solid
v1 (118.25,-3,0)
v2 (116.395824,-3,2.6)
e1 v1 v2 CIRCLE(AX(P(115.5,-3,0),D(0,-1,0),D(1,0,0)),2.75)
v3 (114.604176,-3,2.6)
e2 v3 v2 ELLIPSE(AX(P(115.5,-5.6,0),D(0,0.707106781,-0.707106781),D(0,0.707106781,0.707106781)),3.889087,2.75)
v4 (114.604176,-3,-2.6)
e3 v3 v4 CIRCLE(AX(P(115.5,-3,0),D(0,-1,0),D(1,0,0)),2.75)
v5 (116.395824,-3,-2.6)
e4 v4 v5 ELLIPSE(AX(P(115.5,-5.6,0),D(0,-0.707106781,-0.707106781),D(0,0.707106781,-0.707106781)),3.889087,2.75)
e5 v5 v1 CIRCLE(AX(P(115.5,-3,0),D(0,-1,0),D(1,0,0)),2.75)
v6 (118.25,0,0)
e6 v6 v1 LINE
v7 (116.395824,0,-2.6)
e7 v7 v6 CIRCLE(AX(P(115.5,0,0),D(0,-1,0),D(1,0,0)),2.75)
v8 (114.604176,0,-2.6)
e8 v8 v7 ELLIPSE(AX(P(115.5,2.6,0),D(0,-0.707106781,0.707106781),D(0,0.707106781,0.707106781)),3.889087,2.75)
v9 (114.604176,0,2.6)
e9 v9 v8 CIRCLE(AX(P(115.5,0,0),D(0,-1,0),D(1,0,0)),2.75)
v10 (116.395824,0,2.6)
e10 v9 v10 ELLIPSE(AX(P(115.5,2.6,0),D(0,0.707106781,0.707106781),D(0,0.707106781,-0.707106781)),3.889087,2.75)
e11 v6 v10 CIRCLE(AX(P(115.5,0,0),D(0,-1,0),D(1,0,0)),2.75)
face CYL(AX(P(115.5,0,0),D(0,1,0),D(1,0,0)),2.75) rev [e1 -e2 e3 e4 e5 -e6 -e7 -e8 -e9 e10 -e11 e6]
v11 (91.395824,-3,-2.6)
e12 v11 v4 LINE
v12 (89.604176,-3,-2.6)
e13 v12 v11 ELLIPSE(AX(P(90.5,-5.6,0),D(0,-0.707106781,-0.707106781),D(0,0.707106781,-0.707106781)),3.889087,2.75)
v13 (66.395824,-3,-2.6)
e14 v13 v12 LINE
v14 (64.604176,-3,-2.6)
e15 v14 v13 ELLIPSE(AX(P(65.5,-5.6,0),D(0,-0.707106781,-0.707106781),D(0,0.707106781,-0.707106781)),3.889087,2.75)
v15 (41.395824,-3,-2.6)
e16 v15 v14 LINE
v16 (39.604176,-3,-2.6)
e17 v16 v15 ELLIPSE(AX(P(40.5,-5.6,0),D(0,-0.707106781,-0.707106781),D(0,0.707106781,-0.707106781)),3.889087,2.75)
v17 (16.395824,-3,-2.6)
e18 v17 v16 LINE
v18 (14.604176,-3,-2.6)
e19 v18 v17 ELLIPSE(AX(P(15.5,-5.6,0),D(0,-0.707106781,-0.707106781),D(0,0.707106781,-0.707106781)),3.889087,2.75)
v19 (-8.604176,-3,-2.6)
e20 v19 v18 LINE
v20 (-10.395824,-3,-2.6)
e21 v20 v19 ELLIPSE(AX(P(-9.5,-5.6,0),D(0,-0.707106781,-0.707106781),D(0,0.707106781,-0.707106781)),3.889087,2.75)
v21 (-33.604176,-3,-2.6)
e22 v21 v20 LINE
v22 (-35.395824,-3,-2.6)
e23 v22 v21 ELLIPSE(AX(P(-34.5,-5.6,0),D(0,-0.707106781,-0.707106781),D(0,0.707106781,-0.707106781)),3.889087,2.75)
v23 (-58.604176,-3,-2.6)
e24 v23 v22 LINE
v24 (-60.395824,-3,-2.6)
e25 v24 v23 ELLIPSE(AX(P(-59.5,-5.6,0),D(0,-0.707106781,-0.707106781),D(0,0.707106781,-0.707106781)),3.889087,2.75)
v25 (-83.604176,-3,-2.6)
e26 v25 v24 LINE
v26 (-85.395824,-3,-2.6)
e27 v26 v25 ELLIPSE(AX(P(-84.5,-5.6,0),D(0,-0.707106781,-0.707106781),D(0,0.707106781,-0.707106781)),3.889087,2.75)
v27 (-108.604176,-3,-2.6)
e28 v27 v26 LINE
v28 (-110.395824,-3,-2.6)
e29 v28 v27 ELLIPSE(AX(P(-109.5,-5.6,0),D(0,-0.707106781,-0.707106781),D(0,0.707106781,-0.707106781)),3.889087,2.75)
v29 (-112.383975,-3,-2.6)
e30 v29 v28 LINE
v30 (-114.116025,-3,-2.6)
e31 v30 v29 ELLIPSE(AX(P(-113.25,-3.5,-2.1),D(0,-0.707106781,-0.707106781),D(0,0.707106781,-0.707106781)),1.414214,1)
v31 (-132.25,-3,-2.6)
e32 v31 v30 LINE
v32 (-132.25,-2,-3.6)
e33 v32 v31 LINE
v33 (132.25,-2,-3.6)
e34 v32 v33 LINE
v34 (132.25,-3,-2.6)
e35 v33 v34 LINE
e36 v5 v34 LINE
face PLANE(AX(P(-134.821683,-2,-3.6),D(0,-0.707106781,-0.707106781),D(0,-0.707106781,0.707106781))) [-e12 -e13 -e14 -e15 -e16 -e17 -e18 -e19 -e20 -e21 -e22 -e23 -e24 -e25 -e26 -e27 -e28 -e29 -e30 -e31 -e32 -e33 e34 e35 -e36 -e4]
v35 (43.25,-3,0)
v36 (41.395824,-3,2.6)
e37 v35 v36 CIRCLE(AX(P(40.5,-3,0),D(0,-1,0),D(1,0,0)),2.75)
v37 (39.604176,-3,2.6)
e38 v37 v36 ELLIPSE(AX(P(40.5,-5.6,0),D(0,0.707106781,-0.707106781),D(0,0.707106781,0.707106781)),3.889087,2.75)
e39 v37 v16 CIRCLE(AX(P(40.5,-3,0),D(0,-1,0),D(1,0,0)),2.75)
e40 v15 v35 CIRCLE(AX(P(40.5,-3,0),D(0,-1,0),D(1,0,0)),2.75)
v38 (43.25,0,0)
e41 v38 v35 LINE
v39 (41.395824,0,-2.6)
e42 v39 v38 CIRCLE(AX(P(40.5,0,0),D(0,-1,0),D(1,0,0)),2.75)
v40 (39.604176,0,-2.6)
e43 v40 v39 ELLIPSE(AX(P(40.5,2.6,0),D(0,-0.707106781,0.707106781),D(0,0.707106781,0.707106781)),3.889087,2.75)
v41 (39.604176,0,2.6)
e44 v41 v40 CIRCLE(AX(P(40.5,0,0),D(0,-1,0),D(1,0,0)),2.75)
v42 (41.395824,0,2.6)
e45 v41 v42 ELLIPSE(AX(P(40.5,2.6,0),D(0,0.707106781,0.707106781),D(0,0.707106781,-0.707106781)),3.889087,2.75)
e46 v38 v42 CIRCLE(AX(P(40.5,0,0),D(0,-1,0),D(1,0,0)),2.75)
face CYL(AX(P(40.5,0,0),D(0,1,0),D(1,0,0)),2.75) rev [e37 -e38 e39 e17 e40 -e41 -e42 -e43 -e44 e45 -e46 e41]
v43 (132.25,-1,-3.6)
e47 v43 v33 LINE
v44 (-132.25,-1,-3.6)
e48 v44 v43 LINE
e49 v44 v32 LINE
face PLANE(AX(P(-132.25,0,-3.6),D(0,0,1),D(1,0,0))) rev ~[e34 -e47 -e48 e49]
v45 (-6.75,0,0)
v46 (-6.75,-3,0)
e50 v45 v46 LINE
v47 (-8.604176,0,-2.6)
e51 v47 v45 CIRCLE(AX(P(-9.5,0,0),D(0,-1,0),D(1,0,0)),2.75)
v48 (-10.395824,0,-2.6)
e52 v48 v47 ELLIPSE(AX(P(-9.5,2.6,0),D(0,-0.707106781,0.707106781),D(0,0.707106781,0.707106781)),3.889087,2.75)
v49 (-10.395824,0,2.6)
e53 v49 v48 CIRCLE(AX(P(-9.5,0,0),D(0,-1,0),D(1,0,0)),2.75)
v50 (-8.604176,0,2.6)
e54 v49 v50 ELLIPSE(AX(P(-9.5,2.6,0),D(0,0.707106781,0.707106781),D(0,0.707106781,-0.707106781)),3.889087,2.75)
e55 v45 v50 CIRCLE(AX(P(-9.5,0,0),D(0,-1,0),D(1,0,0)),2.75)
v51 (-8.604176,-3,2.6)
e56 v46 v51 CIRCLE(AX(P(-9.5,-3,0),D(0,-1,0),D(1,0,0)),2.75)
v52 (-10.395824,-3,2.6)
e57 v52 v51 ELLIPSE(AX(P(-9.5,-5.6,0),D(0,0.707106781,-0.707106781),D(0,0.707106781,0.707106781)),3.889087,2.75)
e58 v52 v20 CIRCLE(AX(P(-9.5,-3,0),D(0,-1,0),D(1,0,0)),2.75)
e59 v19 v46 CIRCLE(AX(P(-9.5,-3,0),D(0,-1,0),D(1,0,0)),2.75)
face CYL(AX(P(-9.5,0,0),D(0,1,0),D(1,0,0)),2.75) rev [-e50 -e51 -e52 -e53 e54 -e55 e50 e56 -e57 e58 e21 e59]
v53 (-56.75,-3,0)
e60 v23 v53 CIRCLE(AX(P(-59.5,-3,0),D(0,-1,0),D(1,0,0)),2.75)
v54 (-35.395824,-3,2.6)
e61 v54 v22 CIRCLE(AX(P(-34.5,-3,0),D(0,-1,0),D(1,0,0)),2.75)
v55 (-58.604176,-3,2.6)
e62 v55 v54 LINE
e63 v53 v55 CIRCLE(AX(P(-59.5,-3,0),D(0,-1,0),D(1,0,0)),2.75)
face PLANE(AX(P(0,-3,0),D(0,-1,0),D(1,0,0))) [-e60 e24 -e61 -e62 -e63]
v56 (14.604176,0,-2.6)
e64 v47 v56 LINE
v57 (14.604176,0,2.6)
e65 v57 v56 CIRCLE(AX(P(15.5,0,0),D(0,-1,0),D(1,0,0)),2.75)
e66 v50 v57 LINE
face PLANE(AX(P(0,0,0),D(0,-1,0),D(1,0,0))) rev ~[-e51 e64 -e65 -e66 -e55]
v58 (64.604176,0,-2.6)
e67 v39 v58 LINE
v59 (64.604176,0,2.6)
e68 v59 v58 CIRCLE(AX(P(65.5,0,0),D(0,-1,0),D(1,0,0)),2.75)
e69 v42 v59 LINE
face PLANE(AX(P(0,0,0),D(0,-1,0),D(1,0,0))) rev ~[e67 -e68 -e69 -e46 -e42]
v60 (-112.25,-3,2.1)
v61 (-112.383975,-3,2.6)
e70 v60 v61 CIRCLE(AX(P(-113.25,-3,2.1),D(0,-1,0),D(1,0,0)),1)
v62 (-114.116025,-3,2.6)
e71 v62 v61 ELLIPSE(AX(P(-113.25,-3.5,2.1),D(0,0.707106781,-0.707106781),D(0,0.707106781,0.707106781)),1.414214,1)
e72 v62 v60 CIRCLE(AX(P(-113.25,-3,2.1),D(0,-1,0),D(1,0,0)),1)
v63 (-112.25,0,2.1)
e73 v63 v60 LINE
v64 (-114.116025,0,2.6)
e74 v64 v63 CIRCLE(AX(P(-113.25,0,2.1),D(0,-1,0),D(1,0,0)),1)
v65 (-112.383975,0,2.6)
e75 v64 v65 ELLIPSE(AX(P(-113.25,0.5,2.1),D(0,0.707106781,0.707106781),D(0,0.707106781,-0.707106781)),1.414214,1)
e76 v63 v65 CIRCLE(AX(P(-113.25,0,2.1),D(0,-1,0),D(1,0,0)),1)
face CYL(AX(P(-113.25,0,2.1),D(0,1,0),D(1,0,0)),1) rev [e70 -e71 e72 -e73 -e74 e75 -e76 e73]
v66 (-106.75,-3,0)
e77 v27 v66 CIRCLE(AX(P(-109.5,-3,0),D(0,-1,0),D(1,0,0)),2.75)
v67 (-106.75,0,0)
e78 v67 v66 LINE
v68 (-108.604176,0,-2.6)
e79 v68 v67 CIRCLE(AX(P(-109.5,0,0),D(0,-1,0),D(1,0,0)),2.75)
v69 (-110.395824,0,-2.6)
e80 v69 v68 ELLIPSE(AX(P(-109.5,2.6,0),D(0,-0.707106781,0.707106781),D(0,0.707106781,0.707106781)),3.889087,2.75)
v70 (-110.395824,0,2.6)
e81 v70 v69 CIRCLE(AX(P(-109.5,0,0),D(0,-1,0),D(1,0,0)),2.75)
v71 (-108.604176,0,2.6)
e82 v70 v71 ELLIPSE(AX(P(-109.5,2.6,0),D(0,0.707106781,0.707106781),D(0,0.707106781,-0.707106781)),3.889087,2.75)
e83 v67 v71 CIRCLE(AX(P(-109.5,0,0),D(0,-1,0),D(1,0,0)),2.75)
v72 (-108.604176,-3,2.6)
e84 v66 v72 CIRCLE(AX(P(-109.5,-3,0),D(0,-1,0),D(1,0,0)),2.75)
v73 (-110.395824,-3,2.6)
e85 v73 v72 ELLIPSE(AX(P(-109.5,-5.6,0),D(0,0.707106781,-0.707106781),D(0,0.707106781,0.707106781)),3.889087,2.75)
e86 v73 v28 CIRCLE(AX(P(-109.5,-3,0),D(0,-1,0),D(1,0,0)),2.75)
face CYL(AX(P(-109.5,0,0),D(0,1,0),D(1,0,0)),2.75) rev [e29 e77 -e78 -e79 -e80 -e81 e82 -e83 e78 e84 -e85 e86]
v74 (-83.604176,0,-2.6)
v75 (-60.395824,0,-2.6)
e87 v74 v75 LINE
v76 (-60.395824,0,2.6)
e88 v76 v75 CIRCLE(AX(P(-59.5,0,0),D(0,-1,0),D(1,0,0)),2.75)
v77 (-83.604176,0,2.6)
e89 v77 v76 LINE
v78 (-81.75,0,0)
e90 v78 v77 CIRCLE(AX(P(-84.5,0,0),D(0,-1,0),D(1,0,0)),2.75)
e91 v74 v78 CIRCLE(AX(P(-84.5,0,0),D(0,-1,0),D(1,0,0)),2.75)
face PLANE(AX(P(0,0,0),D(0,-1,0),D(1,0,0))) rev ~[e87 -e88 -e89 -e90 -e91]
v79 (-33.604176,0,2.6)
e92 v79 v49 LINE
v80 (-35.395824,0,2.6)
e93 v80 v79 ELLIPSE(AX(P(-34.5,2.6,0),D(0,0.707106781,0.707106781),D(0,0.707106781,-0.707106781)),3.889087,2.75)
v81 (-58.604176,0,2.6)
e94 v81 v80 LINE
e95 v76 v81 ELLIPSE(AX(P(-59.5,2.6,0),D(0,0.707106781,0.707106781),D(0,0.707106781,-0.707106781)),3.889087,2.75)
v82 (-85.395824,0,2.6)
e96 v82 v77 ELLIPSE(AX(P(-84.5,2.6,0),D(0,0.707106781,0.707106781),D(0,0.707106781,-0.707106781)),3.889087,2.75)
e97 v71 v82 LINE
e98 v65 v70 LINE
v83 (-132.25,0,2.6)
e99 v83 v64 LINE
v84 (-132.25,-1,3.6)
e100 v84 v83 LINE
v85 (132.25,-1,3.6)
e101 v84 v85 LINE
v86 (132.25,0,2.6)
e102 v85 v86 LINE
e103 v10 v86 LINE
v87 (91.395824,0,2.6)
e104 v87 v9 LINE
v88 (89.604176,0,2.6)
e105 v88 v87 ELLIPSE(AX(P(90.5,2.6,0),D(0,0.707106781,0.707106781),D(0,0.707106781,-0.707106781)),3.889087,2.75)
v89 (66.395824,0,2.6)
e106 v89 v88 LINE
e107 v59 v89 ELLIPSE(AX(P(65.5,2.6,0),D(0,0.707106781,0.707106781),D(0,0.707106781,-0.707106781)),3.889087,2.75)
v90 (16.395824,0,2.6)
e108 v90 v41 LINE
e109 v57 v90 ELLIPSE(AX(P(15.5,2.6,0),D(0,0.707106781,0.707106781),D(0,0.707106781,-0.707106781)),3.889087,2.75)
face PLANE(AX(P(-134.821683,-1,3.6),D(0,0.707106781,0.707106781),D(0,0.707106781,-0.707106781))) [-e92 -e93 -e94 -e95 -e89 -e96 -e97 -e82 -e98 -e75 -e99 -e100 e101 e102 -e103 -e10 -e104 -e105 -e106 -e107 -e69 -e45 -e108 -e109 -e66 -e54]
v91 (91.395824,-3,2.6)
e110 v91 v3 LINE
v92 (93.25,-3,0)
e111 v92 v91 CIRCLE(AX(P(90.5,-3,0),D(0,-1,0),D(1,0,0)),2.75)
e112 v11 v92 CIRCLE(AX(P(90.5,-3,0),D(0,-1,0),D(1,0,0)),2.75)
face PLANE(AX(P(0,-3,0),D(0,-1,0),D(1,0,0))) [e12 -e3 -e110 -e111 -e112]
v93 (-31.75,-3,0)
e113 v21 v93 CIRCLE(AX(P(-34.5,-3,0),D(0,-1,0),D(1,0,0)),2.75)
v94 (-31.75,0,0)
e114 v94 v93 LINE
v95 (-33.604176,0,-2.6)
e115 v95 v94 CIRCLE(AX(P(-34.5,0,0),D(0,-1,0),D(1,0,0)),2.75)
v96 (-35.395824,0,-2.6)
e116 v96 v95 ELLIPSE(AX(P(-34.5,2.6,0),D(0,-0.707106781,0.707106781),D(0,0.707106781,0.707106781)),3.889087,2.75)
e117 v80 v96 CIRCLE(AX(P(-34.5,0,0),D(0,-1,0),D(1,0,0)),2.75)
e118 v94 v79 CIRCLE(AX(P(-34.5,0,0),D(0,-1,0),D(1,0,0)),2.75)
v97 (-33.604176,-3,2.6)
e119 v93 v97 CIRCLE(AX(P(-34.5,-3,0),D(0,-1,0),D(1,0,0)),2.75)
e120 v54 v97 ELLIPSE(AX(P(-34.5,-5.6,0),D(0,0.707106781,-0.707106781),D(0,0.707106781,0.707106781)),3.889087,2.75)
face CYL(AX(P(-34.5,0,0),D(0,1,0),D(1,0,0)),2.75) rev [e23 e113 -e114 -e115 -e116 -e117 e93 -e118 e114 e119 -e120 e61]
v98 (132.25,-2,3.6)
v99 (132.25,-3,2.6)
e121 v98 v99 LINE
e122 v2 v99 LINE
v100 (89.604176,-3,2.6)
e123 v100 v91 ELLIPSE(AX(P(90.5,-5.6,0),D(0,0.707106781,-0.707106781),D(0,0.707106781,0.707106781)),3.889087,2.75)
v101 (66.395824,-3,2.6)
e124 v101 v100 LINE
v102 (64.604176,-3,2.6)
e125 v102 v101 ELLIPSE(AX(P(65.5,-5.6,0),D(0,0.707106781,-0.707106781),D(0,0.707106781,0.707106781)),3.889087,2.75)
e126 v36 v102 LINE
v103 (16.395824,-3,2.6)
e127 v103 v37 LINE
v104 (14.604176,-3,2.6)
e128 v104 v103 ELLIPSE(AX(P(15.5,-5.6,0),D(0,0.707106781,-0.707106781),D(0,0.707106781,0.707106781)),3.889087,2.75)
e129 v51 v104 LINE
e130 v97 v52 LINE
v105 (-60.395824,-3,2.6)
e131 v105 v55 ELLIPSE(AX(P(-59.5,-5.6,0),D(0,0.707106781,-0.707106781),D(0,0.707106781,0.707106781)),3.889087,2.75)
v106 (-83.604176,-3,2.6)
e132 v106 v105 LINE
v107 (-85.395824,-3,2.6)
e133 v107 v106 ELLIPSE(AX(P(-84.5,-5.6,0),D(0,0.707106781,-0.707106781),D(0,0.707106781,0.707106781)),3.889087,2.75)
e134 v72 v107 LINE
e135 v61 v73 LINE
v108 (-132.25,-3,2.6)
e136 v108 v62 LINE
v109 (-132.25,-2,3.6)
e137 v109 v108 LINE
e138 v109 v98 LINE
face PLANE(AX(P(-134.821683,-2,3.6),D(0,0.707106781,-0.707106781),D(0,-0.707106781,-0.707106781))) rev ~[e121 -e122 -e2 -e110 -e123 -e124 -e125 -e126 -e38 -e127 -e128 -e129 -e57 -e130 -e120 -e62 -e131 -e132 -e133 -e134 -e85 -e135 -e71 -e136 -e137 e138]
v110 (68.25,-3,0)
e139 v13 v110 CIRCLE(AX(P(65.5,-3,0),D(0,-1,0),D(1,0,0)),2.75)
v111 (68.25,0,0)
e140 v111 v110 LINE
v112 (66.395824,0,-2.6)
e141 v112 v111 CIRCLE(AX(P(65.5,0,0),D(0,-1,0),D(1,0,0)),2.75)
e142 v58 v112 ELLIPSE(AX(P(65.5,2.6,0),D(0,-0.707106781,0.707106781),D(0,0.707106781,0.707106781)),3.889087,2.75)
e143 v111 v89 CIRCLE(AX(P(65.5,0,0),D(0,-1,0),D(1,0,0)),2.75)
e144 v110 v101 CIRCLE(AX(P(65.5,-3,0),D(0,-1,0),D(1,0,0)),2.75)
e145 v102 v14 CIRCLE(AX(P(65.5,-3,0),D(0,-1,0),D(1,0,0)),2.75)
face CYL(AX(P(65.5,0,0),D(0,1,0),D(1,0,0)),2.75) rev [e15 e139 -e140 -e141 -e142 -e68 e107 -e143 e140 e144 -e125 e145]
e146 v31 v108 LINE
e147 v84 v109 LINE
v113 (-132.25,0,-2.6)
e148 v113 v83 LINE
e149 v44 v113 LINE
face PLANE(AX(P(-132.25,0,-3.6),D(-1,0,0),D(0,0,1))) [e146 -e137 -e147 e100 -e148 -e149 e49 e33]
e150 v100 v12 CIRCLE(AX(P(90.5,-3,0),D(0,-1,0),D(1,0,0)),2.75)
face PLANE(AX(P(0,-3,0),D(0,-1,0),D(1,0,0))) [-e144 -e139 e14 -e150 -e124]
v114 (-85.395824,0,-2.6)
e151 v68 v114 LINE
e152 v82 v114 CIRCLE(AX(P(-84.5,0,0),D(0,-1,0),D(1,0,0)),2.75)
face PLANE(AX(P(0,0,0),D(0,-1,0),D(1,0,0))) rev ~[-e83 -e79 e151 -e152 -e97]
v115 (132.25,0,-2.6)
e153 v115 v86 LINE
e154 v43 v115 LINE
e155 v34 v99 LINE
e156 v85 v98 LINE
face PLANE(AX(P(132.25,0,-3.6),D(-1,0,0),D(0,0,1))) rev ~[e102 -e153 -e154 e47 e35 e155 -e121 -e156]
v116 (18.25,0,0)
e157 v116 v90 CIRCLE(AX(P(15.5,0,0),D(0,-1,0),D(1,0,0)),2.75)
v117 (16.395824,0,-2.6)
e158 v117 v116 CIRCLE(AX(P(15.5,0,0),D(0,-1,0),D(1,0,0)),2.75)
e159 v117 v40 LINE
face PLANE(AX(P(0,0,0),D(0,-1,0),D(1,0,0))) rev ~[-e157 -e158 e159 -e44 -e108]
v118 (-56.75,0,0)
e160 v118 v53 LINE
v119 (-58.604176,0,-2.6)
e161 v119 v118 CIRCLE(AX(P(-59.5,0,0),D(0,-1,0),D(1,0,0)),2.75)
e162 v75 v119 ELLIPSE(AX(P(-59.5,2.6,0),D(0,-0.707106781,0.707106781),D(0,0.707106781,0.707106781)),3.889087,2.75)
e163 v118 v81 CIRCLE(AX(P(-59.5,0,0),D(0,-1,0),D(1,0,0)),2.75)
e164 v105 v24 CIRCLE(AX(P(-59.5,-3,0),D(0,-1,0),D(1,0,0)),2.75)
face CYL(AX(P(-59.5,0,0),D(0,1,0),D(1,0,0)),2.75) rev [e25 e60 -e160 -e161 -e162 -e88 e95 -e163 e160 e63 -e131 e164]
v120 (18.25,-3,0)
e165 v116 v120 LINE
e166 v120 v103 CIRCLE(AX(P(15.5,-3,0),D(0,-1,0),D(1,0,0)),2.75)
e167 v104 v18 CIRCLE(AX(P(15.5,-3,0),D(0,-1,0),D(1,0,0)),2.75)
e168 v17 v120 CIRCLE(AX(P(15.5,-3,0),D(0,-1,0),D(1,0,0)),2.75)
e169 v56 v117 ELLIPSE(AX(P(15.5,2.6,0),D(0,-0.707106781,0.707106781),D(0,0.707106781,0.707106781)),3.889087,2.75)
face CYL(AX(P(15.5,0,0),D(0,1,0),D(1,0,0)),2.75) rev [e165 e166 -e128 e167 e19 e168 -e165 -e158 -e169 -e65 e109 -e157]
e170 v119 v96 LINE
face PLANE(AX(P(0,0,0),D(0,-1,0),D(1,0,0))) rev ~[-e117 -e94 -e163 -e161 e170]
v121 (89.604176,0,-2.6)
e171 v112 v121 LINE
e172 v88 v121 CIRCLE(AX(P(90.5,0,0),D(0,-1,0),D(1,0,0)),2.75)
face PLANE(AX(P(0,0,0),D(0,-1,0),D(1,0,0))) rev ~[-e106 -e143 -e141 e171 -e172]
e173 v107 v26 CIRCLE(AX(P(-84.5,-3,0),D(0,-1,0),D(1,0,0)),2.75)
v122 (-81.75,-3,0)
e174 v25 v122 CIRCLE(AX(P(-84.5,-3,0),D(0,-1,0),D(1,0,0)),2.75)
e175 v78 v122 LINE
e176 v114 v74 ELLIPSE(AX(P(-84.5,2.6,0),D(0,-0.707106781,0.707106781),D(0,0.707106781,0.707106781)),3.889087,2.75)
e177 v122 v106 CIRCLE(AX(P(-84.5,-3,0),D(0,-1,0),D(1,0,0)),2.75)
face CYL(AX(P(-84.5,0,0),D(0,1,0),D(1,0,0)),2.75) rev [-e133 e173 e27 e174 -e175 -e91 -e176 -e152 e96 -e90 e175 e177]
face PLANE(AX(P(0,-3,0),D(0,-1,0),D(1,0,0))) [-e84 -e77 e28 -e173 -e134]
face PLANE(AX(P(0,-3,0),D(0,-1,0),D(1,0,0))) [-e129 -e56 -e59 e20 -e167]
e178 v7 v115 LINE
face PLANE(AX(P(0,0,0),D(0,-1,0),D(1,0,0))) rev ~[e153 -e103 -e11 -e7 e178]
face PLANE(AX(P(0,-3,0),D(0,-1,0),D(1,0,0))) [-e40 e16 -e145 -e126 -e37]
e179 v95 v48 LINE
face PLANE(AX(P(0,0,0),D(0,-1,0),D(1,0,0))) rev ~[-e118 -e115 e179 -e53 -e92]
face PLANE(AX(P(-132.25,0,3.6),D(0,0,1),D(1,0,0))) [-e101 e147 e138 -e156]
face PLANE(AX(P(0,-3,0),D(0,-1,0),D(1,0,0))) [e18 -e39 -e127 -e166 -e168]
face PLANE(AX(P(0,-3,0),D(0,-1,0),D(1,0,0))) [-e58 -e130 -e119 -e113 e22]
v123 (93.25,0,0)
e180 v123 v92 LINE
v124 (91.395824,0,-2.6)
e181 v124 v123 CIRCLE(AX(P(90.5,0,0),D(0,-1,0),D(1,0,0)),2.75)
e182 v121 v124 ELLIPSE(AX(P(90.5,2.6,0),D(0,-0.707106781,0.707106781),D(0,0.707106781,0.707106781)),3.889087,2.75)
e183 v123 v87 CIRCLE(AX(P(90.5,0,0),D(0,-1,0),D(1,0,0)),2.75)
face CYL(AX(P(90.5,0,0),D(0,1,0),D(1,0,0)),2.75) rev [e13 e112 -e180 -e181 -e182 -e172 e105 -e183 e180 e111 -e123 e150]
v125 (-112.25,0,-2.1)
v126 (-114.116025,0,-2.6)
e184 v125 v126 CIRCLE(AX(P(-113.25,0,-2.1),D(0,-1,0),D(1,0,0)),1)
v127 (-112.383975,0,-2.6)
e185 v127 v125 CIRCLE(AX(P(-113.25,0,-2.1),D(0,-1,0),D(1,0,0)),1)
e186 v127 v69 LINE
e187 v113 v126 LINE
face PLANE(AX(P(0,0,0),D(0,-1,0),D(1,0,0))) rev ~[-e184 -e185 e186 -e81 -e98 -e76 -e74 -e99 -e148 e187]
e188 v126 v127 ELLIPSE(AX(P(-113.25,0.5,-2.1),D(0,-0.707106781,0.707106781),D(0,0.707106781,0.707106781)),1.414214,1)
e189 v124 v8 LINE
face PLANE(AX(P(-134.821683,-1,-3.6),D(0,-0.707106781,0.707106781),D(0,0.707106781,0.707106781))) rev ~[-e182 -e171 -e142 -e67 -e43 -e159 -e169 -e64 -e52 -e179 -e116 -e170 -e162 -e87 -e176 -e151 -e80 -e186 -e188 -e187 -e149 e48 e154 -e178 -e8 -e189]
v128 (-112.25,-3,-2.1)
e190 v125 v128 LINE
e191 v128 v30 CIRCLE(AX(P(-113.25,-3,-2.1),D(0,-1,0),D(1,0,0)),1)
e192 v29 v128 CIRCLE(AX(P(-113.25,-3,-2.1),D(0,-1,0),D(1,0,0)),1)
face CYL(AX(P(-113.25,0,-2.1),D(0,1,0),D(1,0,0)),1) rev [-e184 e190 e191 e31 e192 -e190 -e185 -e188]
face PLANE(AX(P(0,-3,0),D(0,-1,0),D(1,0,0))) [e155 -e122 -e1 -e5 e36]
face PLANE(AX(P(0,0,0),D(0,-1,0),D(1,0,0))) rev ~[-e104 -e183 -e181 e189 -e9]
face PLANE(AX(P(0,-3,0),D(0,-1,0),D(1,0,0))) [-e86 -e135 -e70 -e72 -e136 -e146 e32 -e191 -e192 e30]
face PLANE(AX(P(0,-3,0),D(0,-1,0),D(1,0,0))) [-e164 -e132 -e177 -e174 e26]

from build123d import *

# Parameters (mm, degrees)
F0_W        = 264.5
F0_H        = 7.2
F0_R        = 1
F0_R_2      = 2.75
F1_DEPTH    = 3
F2_T1_DEPTH = 269.6433659759


# Not quite as in the source:
# - a fillet or chamfer that OpenCascade refuses, or shapes differently, is made with other operations: its cross-section is extruded or revolved along the edge and cut away or added


with BuildPart() as f1:
    # F0 (on Front) → F1 (new body)
    with BuildSketch(Plane.XZ):
        Rectangle(F0_W, F0_H)
        with Locations((-113.25, -2.1)):
            Circle(F0_R, mode=Mode.SUBTRACT)
        with Locations((-109.5, 0)):
            Circle(F0_R_2, mode=Mode.SUBTRACT)
        with Locations((-84.5, 0)):
            Circle(F0_R_2, mode=Mode.SUBTRACT)
        with Locations((-59.5, 0)):
            Circle(F0_R_2, mode=Mode.SUBTRACT)
        with Locations((-34.5, 0)):
            Circle(F0_R_2, mode=Mode.SUBTRACT)
        with Locations((-9.5, 0)):
            Circle(F0_R_2, mode=Mode.SUBTRACT)
        with Locations((-113.25, 2.1)):
            Circle(F0_R, mode=Mode.SUBTRACT)
        with Locations((15.5, 0)):
            Circle(F0_R_2, mode=Mode.SUBTRACT)
        with Locations((40.5, 0)):
            Circle(F0_R_2, mode=Mode.SUBTRACT)
        with Locations((65.5, 0)):
            Circle(F0_R_2, mode=Mode.SUBTRACT)
        with Locations((90.5, 0)):
            Circle(F0_R_2, mode=Mode.SUBTRACT)
        with Locations((115.5, 0)):
            Circle(F0_R_2, mode=Mode.SUBTRACT)
    extrude(amount=F1_DEPTH)

    # F2: chamfer of 1 on 4 edges, made by hand

    # F2_s2 → F2_t1 (cut)
    with BuildSketch(Plane.YZ.offset(-134.821682988)):
        Polygon((-2, -3.6), (-3, -2.6), (-3, -3.6), align=None)
        Polygon((-1, -3.6), (0, -2.6), (0, -3.6), align=None)
        Polygon((-1, 3.6), (0, 2.6), (0, 3.6), align=None)
        Polygon((-2, 3.6), (-3, 2.6), (-3, 3.6), align=None)
    extrude(amount=F2_T1_DEPTH, mode=Mode.SUBTRACT)


solid = f1.part
